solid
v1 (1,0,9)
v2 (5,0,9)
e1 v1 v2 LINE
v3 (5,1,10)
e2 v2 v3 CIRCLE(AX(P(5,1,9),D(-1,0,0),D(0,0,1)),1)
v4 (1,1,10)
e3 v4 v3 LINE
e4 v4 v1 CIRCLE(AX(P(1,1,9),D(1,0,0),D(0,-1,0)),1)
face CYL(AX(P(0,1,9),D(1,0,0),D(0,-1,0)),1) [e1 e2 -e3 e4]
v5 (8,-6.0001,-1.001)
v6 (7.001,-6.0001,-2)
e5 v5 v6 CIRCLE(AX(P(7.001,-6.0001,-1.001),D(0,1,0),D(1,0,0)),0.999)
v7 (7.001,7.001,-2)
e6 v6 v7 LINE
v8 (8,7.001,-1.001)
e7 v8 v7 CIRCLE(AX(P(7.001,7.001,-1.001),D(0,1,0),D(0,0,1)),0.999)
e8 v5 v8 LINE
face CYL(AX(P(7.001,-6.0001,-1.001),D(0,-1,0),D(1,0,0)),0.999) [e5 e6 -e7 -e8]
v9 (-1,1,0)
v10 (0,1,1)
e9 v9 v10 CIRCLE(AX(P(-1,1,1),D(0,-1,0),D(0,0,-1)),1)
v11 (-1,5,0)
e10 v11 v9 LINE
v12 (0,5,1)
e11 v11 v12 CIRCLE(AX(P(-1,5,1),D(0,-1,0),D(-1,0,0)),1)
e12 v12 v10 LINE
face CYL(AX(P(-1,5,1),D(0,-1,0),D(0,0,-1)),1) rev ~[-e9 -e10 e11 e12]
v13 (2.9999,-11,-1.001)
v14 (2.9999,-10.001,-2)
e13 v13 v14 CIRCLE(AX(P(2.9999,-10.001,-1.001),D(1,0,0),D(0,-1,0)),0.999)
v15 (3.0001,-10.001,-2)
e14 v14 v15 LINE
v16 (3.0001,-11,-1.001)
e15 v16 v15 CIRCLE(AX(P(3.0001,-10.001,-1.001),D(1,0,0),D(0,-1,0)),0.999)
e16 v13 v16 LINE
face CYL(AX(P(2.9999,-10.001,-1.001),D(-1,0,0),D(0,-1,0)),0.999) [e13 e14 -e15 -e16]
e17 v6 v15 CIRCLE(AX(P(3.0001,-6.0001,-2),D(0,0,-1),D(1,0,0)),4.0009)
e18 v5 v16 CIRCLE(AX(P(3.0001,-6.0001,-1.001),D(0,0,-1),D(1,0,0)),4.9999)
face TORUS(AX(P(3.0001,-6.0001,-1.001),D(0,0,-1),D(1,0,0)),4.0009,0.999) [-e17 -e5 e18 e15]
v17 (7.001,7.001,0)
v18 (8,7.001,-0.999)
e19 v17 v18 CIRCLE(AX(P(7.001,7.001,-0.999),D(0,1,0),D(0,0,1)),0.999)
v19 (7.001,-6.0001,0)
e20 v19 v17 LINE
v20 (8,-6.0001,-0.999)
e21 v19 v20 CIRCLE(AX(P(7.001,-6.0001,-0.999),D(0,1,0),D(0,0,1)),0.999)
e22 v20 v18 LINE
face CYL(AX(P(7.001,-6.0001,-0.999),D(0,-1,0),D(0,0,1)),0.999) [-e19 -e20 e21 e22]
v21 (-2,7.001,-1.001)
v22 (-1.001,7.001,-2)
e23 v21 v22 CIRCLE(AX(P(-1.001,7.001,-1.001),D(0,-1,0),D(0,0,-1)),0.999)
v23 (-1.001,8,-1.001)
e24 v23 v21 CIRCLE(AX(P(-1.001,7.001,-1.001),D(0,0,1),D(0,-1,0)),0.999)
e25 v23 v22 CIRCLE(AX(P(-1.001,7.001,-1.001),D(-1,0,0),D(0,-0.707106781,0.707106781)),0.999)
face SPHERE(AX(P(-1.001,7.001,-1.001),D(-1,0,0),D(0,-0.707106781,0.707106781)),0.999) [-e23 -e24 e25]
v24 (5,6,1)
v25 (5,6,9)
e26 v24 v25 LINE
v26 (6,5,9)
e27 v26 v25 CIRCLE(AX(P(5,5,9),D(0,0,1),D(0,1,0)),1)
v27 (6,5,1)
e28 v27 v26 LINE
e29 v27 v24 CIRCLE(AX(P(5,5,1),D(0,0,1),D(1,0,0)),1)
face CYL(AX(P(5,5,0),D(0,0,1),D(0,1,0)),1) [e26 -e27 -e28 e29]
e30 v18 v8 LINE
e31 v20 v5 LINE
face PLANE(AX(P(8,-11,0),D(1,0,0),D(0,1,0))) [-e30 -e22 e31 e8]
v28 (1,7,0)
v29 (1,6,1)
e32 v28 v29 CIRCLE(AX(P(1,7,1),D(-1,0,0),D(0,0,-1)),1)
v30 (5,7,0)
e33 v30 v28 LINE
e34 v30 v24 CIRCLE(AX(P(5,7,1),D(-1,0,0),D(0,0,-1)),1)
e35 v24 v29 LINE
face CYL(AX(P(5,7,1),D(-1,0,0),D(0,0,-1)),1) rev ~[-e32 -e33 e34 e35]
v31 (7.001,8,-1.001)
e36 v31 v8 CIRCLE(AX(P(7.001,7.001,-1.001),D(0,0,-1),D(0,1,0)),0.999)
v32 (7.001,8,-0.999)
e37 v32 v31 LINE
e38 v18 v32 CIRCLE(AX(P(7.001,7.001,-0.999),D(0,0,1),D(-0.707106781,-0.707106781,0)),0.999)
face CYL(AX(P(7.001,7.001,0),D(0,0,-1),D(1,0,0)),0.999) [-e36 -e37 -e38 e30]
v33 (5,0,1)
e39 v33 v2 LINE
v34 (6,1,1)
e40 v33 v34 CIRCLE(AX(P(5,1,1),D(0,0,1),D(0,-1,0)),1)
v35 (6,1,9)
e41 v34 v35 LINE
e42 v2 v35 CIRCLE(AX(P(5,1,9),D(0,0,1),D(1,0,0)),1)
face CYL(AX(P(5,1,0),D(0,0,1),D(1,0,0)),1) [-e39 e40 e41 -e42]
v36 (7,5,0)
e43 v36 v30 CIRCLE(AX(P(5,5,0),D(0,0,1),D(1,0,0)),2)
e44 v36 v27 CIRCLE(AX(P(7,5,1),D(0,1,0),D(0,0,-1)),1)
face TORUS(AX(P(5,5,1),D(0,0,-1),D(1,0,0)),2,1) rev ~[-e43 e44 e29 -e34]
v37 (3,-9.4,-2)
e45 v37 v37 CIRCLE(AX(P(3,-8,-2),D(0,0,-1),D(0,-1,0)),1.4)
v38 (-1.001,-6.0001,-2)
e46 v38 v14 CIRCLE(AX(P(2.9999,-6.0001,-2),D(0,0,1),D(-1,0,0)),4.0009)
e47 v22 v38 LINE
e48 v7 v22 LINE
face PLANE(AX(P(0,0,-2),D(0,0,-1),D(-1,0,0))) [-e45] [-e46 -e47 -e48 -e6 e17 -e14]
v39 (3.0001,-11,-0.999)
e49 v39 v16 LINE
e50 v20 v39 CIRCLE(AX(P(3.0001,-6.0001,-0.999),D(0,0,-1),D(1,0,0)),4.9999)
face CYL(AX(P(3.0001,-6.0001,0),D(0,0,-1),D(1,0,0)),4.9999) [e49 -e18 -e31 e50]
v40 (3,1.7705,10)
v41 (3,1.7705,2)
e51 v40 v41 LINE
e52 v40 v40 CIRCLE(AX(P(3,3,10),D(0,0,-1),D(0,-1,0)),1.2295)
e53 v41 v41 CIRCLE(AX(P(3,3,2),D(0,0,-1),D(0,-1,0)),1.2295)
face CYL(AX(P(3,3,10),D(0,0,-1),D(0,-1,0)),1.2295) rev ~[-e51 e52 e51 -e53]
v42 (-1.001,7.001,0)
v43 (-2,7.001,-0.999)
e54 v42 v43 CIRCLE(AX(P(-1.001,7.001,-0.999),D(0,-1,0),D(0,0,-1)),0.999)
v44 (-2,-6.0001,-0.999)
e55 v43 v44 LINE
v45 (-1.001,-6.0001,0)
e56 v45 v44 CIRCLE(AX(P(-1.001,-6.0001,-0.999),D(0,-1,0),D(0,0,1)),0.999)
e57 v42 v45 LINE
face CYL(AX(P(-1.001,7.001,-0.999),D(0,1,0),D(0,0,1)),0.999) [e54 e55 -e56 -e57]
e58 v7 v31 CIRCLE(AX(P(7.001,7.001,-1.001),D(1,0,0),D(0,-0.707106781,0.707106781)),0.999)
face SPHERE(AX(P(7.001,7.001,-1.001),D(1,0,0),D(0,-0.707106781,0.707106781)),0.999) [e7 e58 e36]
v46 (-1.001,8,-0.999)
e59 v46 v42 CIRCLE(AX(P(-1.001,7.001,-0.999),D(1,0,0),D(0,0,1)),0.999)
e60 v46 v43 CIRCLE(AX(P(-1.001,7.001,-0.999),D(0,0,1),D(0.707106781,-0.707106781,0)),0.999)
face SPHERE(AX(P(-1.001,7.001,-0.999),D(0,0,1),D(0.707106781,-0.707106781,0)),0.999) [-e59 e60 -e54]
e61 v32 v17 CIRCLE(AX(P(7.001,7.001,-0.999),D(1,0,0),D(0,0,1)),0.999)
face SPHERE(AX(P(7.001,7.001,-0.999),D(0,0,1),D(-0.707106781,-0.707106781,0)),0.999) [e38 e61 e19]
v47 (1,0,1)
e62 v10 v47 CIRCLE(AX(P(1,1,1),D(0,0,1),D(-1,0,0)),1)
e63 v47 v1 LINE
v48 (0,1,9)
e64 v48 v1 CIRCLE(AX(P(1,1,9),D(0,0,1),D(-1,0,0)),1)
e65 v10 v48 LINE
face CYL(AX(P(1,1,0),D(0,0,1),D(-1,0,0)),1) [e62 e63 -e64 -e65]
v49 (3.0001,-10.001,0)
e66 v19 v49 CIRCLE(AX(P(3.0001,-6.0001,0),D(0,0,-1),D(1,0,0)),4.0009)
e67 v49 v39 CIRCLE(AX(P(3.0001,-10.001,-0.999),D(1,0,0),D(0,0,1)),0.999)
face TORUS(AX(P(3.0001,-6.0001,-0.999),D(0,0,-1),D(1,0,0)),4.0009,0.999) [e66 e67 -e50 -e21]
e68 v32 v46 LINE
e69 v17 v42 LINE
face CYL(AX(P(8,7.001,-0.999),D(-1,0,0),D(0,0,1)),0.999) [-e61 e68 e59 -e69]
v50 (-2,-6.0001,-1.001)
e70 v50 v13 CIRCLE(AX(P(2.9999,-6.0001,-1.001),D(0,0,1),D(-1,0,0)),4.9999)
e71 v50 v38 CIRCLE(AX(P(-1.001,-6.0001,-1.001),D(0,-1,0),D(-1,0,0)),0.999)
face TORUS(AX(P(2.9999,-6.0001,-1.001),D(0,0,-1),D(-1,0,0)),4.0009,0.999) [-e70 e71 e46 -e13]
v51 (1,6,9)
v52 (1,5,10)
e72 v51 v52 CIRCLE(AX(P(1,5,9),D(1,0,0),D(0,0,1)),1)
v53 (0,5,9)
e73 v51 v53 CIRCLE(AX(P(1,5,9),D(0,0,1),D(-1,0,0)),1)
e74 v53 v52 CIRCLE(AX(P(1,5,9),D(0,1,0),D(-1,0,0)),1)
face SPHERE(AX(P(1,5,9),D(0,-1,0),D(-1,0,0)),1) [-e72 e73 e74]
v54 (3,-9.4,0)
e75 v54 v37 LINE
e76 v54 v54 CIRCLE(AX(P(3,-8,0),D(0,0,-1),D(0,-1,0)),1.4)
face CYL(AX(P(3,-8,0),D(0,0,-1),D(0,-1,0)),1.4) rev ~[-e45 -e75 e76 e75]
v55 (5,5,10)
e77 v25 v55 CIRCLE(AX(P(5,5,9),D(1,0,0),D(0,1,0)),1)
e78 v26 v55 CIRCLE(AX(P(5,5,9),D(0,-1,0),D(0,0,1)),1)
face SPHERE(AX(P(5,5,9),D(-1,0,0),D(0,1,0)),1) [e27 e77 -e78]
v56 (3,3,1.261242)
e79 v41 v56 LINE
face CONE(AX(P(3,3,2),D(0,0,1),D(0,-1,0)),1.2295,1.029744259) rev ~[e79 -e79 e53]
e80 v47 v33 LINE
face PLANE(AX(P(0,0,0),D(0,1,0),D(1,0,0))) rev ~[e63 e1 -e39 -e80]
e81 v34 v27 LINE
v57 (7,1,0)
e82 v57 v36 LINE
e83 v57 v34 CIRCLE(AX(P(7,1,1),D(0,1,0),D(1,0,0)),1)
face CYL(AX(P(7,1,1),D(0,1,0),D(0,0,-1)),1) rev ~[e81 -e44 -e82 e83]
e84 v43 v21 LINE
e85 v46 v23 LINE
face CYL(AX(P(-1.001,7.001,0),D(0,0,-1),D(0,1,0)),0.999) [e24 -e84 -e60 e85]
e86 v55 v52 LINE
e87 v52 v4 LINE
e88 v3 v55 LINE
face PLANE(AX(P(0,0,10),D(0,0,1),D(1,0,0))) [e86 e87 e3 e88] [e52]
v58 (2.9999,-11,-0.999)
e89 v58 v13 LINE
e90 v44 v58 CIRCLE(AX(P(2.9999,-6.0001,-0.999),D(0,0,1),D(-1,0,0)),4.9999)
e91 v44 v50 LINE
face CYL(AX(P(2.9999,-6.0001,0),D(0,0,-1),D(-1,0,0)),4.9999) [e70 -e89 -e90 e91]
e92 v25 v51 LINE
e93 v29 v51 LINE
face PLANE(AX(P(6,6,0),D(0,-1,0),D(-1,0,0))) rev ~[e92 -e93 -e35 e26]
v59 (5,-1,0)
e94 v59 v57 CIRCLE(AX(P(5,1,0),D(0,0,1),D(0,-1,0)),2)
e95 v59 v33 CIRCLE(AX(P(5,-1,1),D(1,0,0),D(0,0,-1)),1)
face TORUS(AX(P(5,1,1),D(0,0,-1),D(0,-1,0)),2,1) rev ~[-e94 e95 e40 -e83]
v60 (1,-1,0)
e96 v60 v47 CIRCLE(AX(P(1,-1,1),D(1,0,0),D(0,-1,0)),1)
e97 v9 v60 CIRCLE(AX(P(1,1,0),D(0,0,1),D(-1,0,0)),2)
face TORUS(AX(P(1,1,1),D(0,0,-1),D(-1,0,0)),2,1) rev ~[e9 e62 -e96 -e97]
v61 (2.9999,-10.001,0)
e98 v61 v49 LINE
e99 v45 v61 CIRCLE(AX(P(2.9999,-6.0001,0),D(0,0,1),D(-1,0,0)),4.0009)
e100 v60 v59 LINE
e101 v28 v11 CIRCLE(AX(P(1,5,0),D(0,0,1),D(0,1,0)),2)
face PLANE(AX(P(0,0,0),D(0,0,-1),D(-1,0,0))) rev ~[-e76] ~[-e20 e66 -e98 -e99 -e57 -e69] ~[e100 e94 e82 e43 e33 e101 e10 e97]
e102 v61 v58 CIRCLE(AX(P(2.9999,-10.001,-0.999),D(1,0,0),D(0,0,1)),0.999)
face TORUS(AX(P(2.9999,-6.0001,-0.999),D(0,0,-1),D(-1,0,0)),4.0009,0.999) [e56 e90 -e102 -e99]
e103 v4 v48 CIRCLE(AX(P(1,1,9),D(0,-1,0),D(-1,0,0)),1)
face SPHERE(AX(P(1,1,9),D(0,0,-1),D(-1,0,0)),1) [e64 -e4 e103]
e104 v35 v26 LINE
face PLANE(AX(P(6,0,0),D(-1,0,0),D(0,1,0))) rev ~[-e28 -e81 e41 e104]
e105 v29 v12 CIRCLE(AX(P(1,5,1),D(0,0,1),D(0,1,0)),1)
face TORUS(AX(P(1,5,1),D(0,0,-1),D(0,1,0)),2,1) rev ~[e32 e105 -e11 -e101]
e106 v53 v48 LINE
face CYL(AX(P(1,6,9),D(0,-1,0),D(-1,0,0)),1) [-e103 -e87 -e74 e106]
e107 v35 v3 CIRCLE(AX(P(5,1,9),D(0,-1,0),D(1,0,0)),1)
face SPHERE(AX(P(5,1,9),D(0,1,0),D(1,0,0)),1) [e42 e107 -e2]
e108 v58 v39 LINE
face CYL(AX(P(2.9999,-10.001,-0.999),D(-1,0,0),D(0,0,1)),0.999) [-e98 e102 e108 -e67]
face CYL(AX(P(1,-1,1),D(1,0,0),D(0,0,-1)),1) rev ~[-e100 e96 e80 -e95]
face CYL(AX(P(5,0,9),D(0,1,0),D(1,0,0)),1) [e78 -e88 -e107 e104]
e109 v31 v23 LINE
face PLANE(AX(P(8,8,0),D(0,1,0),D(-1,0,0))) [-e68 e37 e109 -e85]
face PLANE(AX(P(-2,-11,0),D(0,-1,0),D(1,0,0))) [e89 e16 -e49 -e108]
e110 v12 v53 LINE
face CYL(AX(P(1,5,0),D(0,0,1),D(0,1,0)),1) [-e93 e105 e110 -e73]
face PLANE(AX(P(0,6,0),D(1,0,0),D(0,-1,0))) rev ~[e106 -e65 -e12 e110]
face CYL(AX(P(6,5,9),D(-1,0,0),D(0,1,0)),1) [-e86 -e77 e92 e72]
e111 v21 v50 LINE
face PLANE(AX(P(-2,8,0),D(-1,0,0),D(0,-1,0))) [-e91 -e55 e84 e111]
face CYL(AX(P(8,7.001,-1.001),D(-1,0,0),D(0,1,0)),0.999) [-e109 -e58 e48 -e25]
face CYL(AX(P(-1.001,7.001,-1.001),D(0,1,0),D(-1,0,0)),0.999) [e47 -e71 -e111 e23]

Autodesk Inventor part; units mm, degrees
ref_plane "YZ Plane" through (0, 0, 0) normal (1, 0, 0) x (0, 1, 0)
ref_plane "XZ Plane" through (0, 0, 0) normal (0, 1, 0) x (-1, 0, 0)
ref_plane "XY Plane" through (0, 0, 0) normal (0, 0, 1) x (1, 0, 0)
sketch "Sketch1" plane through (0, 0, 0) normal (0, 0, 1) x (1, 0, 0)
  line L0 (0, 0) -> (6, 0)
  line L1 (6, 0) -> (6, 6)
  line L2 (6, 6) -> (0, 6)
  line L3 (0, 6) -> (0, 0)
  dimension "d0" = 6
  dimension "d1" = 6
extrude "Extrusion1" add sketch "Sketch1" along normal blind 10
sketch "Sketch8" plane through (0, 0, 0) normal (0, 0, -1) x (-1, 0, 0)
  line L0 (0, 0) -> (-6, 0) projected
  line L1 (0, 6) -> (0, 0) projected
  line L2 (-6, 6) -> (0, 6) projected
  line L3 (-6, 0) -> (-6, 6) projected
  line L4 (-8, 8) -> (2, 8)
  line L5 (2, 8) -> (2, -11)
  line L6 (2, -11) -> (-8, -11)
  line L7 (-8, -11) -> (-8, 8)
  dimension "d46" = 2
  dimension "d47" = 2
  dimension "d48" = 2
  dimension "d49" = 11
extrude "Extrusion4" add sketch "Sketch8" along normal blind 2 contours L0 L3 L2 L1 | L4 L5 L6 L7
sketch "Sketch9" plane through (0, 0, 10) normal (0, 0, 1) x (1, 0, 0)
  line L0 (0, 6) -> (6, 0) construction
  line L1 (0, 0) -> (6, 6) construction
  point P0 (3, 3)
hole "Hole5" at (3, 3, 10) direction (0, 0, -1) diameter 2.459 depth 8 tip angle 118 thread size "M3x0.5" class "6H" standard "ISO Metric profile"
sketch "Sketch10" plane through (0, 0, 0) normal (0, 0, 1) x (1, 0, 0)
  line L0 (8, 8) -> (-2, 8) projected
  line L1 (-2, -11) -> (8, -11) projected
  line L2 (3, -11) -> (3, 8) construction
  point P0 (3, -8)
  dimension "d59" = 3
hole "Hole6" at (3, -8, 0) direction (0, 0, -1) diameter 2.8 end through all
fillet "Fillet4" radius 5 2 edges at (8, -11, -1) (-2, -11, -1)
fillet "Fillet5" radius 1 8 edges at (0, 0, 5) (0, 3, 10) (0, 6, 5) (3, 6, 10) (6, 6, 5) (6, 3, 10) (6, 0, 5) (3, 0, 10)
fillet "Fillet6" radius 1 8 edges at (3, 6, 0) (0.2929, 5.7071, 0) (0, 3, 0) (0.2929, 0.2929, 0) (3, 0, 0) (5.7071, 0.2929, 0) (6, 3, 0) (5.7071, 5.7071, 0)
fillet "Fillet8" radius 0.999 4 edges at (8, 8, -1) (-2, 8, -1) (3, 8, 0) (3, 8, -2)
fillet "Fillet9" radius 0.999 10 edges at (7.7074, 7.7074, -0.2926) (-0.5356, -9.5356, 0) (-2, 0.5005, 0) (-1.7074, 7.7074, -0.2926) (8, 0.5005, 0) (-0.5356, -9.5356, -2) (-2, 0.5005, -2) (-1.7074, 7.7074, -1.7074) (7.7074, 7.7074, -1.7074) (8, 0.5005, -2)
properties part number "termination_lv_conductor" material "Copper, Cast"
